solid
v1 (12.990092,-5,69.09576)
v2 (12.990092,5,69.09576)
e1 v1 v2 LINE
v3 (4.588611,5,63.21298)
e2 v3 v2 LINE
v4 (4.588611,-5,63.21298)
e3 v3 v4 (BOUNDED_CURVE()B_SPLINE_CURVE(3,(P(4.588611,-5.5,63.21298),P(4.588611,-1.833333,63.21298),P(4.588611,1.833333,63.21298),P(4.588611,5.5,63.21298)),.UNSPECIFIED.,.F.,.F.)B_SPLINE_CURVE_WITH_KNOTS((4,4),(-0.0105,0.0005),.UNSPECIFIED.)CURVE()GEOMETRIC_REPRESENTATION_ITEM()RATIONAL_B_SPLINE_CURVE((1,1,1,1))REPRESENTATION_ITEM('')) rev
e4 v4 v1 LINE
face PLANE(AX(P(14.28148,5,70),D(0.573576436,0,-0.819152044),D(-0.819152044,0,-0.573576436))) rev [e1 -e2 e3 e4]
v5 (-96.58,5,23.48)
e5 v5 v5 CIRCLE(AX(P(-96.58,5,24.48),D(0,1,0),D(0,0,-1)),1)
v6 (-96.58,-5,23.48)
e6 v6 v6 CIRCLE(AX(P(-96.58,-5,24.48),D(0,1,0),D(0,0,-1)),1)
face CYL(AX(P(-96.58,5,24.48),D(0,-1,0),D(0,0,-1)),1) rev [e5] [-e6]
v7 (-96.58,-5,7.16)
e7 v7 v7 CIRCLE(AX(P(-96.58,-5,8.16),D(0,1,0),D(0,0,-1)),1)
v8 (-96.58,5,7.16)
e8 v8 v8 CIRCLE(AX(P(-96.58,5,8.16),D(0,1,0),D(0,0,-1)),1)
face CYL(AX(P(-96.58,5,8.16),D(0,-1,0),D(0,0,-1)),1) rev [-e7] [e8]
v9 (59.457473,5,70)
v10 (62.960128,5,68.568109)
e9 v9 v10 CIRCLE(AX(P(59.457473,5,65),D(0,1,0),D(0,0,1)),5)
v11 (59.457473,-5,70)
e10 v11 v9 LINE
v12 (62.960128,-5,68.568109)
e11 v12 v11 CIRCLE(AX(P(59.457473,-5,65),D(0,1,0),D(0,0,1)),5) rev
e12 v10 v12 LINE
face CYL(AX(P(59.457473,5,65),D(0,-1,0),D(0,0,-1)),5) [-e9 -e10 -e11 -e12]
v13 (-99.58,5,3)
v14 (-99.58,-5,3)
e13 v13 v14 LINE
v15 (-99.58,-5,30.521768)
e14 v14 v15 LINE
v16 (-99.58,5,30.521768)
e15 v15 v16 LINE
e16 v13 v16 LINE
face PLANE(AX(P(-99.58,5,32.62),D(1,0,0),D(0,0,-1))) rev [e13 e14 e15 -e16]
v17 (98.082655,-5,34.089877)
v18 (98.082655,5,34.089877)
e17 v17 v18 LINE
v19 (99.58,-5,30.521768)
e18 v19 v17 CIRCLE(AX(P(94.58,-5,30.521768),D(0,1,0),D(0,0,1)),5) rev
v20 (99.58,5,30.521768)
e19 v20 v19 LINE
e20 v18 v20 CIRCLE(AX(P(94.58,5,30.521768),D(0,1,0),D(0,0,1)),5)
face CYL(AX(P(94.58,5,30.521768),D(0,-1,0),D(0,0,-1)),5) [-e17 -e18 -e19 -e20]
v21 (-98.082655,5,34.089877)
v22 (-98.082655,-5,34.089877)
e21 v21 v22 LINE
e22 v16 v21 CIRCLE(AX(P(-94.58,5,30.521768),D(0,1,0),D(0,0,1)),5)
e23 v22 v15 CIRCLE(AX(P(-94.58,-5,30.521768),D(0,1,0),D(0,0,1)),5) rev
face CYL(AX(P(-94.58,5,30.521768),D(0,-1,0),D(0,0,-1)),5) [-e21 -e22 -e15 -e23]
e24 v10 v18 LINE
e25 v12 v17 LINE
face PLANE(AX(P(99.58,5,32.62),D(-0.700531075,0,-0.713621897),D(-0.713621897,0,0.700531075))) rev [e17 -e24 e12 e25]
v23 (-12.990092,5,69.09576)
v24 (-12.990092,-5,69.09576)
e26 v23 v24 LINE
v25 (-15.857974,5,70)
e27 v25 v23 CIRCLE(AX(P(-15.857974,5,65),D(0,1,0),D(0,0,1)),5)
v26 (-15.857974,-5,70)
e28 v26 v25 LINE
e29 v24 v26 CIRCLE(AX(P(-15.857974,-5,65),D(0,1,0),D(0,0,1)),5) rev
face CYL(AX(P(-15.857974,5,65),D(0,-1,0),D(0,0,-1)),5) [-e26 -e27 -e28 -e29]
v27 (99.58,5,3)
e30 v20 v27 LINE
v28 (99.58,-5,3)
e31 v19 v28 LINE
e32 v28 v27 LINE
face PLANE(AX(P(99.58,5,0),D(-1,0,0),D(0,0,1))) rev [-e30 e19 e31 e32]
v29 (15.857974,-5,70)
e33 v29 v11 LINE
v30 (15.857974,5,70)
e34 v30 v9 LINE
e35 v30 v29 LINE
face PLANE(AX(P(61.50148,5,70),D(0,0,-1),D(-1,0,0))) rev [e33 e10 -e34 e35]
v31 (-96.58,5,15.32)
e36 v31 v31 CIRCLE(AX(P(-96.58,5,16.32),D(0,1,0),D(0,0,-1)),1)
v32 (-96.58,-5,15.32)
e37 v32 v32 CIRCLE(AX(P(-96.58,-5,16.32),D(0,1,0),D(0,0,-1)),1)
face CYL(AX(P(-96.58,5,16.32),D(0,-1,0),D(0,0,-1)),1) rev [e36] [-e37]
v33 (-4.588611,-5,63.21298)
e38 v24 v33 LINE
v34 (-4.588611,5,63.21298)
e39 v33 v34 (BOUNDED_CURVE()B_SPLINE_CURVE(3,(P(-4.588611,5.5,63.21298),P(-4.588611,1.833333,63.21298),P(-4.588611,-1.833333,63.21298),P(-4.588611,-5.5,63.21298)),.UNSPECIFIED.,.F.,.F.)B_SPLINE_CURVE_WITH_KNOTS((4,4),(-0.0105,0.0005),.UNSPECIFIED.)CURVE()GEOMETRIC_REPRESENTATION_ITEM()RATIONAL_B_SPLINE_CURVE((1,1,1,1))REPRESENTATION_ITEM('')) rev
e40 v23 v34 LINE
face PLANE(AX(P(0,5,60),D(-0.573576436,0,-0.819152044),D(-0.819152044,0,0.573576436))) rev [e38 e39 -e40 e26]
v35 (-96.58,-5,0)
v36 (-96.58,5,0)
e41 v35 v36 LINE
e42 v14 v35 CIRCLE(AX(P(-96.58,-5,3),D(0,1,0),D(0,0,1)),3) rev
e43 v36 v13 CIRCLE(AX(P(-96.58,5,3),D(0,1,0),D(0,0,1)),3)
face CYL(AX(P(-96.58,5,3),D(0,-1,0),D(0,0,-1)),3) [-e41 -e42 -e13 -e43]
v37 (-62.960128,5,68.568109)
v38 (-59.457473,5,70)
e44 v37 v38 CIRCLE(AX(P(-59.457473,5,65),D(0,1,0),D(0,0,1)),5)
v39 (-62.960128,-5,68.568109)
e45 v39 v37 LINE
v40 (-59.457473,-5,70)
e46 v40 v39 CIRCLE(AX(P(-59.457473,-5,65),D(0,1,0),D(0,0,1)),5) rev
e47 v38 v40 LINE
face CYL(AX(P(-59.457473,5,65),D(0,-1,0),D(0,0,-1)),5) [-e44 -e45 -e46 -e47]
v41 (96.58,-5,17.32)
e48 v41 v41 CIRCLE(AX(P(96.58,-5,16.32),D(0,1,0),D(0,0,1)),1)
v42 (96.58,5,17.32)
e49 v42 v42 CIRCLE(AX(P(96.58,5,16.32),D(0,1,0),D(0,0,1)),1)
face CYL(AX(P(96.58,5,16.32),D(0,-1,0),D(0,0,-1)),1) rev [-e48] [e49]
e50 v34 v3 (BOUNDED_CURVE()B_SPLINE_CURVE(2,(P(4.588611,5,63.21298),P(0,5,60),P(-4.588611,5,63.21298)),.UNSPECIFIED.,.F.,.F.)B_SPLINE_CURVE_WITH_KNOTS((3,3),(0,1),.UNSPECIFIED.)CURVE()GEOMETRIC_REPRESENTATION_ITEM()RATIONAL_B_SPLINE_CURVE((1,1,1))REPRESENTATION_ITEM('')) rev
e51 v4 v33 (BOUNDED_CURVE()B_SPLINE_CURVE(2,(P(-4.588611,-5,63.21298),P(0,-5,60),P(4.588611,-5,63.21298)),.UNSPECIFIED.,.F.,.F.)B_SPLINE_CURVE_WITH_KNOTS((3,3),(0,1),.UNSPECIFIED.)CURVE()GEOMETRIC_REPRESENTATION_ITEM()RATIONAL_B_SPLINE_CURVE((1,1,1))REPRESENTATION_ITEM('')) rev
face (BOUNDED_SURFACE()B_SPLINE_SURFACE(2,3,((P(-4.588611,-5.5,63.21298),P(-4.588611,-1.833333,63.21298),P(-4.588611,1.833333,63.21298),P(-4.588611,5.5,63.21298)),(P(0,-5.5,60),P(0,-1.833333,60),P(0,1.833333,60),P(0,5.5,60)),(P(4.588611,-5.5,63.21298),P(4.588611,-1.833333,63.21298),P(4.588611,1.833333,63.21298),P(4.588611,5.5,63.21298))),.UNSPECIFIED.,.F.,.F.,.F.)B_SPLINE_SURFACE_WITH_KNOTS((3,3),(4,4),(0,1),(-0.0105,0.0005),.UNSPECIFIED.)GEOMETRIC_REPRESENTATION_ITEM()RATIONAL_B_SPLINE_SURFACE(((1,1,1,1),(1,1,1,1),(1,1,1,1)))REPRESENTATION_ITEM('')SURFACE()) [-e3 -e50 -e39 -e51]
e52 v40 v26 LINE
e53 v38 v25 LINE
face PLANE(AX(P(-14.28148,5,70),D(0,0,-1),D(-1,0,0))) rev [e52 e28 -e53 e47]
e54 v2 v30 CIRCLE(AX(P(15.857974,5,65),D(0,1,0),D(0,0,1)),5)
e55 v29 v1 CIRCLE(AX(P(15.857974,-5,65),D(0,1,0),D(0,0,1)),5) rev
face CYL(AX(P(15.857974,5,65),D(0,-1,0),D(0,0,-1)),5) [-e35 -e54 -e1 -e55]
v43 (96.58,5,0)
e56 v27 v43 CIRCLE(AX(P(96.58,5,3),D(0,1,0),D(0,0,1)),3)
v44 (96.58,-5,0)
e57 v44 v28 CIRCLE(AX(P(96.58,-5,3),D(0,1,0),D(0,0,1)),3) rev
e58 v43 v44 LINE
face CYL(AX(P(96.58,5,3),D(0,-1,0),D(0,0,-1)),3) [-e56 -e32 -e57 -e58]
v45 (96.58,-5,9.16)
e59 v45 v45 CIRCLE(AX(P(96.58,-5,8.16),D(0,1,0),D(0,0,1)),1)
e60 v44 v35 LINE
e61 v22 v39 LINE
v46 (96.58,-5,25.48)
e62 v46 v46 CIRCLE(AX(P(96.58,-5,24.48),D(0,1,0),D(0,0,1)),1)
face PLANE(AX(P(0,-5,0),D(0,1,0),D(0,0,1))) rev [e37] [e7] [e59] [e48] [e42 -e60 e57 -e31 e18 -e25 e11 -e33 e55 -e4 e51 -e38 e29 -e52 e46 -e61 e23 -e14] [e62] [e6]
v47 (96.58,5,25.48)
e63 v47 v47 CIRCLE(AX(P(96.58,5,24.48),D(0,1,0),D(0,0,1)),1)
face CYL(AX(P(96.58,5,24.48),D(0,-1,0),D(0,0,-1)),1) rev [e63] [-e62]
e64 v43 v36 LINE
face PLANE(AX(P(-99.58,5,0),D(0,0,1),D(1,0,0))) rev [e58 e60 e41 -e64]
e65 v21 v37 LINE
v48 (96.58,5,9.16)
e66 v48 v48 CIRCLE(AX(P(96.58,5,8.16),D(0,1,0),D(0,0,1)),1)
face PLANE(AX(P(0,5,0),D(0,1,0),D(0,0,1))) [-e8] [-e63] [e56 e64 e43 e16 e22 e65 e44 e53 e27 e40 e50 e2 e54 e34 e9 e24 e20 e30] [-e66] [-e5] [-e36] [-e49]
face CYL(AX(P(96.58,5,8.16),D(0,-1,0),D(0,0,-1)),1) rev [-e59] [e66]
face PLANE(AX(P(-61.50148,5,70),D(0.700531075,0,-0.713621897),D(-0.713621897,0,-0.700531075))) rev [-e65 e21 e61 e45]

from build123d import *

# Parameters (mm, degrees)
SKETCH1_R           = 1
BOSS_EXTRUDE1_DEPTH = 5
FILLET1_R           = 5
FILLET2_R           = 5
FILLET3_R           = 5
FILLET4_R           = 3


with BuildPart() as part:
    # Sketch1 → Boss-Extrude1 (new, symmetric)
    with BuildSketch(Plane(origin=(0, 0, 0), x_dir=(1, 0, 0), z_dir=(0, 1, 0))):
        Polygon((0, -60), (-14.281480067, -70), (-61.501480067, -70), (-99.58, -32.62), (-99.58, 0), (99.58, 0), (99.58, -32.62), (61.501480067, -70), (14.281480067, -70), align=None)
        with Locations(Location((96.58, -8.16, 0), (0, 0, 270))):
            Circle(SKETCH1_R, mode=Mode.SUBTRACT)
        with Locations(Location((96.58, -16.32, 0), (0, 0, 270))):
            Circle(SKETCH1_R, mode=Mode.SUBTRACT)
        with Locations(Location((96.58, -24.48, 0), (0, 0, 270))):
            Circle(SKETCH1_R, mode=Mode.SUBTRACT)
        with Locations(Location((-96.58, -24.48, 0), (0, 0, 90))):
            Circle(SKETCH1_R, mode=Mode.SUBTRACT)
        with Locations(Location((-96.58, -16.32, 0), (0, 0, 90))):
            Circle(SKETCH1_R, mode=Mode.SUBTRACT)
        with Locations(Location((-96.58, -8.16, 0), (0, 0, 90))):
            Circle(SKETCH1_R, mode=Mode.SUBTRACT)
    extrude(amount=BOSS_EXTRUDE1_DEPTH, both=True)

    # Fillet1
    fillet1_edges = [part.edges().sort_by_distance(p)[0] for p in [
        (-14.281480067, 0, 70),
        (14.281480067, 0, 70),
    ]]
    fillet(fillet1_edges, radius=FILLET1_R)

    # Fillet2
    fillet2_edges = [part.edges().sort_by_distance(p)[0] for p in [
        (-61.501480067, 0, 70),
        (61.501480067, 0, 70),
    ]]
    fillet(fillet2_edges, radius=FILLET2_R)

    # Fillet3
    fillet3_edges = [part.edges().sort_by_distance(p)[0] for p in [
        (-99.58, 0, 32.62),
        (99.58, 0, 32.62),
    ]]
    fillet(fillet3_edges, radius=FILLET3_R)

    # Fillet4
    fillet4_edges = [part.edges().sort_by_distance(p)[0] for p in [
        (-99.58, 0, 0),
        (99.58, 0, 0),
    ]]
    fillet(fillet4_edges, radius=FILLET4_R)

    # Fillet5
    # a fillet whose section is not a circle: 8 mm, written as the material it adds along each edge
    with BuildSketch(Plane(origin=(0, -5, 60), x_dir=(-0.8191520442889911, 0, 0.5735764363510473), z_dir=(0, 1, 0))) as fillet5_piece_1:
        with BuildLine():
            Bezier((5.601660306, 0), (0, 0), (-1.915880661, 5.263838853), weights=[1, 1, 1])
            Line((-1.915880661, 5.263838853), (0, 0))
            Line((0, 0), (5.601660306, 0))
        make_face()
    extrude(amount=10)


solid = part.part
